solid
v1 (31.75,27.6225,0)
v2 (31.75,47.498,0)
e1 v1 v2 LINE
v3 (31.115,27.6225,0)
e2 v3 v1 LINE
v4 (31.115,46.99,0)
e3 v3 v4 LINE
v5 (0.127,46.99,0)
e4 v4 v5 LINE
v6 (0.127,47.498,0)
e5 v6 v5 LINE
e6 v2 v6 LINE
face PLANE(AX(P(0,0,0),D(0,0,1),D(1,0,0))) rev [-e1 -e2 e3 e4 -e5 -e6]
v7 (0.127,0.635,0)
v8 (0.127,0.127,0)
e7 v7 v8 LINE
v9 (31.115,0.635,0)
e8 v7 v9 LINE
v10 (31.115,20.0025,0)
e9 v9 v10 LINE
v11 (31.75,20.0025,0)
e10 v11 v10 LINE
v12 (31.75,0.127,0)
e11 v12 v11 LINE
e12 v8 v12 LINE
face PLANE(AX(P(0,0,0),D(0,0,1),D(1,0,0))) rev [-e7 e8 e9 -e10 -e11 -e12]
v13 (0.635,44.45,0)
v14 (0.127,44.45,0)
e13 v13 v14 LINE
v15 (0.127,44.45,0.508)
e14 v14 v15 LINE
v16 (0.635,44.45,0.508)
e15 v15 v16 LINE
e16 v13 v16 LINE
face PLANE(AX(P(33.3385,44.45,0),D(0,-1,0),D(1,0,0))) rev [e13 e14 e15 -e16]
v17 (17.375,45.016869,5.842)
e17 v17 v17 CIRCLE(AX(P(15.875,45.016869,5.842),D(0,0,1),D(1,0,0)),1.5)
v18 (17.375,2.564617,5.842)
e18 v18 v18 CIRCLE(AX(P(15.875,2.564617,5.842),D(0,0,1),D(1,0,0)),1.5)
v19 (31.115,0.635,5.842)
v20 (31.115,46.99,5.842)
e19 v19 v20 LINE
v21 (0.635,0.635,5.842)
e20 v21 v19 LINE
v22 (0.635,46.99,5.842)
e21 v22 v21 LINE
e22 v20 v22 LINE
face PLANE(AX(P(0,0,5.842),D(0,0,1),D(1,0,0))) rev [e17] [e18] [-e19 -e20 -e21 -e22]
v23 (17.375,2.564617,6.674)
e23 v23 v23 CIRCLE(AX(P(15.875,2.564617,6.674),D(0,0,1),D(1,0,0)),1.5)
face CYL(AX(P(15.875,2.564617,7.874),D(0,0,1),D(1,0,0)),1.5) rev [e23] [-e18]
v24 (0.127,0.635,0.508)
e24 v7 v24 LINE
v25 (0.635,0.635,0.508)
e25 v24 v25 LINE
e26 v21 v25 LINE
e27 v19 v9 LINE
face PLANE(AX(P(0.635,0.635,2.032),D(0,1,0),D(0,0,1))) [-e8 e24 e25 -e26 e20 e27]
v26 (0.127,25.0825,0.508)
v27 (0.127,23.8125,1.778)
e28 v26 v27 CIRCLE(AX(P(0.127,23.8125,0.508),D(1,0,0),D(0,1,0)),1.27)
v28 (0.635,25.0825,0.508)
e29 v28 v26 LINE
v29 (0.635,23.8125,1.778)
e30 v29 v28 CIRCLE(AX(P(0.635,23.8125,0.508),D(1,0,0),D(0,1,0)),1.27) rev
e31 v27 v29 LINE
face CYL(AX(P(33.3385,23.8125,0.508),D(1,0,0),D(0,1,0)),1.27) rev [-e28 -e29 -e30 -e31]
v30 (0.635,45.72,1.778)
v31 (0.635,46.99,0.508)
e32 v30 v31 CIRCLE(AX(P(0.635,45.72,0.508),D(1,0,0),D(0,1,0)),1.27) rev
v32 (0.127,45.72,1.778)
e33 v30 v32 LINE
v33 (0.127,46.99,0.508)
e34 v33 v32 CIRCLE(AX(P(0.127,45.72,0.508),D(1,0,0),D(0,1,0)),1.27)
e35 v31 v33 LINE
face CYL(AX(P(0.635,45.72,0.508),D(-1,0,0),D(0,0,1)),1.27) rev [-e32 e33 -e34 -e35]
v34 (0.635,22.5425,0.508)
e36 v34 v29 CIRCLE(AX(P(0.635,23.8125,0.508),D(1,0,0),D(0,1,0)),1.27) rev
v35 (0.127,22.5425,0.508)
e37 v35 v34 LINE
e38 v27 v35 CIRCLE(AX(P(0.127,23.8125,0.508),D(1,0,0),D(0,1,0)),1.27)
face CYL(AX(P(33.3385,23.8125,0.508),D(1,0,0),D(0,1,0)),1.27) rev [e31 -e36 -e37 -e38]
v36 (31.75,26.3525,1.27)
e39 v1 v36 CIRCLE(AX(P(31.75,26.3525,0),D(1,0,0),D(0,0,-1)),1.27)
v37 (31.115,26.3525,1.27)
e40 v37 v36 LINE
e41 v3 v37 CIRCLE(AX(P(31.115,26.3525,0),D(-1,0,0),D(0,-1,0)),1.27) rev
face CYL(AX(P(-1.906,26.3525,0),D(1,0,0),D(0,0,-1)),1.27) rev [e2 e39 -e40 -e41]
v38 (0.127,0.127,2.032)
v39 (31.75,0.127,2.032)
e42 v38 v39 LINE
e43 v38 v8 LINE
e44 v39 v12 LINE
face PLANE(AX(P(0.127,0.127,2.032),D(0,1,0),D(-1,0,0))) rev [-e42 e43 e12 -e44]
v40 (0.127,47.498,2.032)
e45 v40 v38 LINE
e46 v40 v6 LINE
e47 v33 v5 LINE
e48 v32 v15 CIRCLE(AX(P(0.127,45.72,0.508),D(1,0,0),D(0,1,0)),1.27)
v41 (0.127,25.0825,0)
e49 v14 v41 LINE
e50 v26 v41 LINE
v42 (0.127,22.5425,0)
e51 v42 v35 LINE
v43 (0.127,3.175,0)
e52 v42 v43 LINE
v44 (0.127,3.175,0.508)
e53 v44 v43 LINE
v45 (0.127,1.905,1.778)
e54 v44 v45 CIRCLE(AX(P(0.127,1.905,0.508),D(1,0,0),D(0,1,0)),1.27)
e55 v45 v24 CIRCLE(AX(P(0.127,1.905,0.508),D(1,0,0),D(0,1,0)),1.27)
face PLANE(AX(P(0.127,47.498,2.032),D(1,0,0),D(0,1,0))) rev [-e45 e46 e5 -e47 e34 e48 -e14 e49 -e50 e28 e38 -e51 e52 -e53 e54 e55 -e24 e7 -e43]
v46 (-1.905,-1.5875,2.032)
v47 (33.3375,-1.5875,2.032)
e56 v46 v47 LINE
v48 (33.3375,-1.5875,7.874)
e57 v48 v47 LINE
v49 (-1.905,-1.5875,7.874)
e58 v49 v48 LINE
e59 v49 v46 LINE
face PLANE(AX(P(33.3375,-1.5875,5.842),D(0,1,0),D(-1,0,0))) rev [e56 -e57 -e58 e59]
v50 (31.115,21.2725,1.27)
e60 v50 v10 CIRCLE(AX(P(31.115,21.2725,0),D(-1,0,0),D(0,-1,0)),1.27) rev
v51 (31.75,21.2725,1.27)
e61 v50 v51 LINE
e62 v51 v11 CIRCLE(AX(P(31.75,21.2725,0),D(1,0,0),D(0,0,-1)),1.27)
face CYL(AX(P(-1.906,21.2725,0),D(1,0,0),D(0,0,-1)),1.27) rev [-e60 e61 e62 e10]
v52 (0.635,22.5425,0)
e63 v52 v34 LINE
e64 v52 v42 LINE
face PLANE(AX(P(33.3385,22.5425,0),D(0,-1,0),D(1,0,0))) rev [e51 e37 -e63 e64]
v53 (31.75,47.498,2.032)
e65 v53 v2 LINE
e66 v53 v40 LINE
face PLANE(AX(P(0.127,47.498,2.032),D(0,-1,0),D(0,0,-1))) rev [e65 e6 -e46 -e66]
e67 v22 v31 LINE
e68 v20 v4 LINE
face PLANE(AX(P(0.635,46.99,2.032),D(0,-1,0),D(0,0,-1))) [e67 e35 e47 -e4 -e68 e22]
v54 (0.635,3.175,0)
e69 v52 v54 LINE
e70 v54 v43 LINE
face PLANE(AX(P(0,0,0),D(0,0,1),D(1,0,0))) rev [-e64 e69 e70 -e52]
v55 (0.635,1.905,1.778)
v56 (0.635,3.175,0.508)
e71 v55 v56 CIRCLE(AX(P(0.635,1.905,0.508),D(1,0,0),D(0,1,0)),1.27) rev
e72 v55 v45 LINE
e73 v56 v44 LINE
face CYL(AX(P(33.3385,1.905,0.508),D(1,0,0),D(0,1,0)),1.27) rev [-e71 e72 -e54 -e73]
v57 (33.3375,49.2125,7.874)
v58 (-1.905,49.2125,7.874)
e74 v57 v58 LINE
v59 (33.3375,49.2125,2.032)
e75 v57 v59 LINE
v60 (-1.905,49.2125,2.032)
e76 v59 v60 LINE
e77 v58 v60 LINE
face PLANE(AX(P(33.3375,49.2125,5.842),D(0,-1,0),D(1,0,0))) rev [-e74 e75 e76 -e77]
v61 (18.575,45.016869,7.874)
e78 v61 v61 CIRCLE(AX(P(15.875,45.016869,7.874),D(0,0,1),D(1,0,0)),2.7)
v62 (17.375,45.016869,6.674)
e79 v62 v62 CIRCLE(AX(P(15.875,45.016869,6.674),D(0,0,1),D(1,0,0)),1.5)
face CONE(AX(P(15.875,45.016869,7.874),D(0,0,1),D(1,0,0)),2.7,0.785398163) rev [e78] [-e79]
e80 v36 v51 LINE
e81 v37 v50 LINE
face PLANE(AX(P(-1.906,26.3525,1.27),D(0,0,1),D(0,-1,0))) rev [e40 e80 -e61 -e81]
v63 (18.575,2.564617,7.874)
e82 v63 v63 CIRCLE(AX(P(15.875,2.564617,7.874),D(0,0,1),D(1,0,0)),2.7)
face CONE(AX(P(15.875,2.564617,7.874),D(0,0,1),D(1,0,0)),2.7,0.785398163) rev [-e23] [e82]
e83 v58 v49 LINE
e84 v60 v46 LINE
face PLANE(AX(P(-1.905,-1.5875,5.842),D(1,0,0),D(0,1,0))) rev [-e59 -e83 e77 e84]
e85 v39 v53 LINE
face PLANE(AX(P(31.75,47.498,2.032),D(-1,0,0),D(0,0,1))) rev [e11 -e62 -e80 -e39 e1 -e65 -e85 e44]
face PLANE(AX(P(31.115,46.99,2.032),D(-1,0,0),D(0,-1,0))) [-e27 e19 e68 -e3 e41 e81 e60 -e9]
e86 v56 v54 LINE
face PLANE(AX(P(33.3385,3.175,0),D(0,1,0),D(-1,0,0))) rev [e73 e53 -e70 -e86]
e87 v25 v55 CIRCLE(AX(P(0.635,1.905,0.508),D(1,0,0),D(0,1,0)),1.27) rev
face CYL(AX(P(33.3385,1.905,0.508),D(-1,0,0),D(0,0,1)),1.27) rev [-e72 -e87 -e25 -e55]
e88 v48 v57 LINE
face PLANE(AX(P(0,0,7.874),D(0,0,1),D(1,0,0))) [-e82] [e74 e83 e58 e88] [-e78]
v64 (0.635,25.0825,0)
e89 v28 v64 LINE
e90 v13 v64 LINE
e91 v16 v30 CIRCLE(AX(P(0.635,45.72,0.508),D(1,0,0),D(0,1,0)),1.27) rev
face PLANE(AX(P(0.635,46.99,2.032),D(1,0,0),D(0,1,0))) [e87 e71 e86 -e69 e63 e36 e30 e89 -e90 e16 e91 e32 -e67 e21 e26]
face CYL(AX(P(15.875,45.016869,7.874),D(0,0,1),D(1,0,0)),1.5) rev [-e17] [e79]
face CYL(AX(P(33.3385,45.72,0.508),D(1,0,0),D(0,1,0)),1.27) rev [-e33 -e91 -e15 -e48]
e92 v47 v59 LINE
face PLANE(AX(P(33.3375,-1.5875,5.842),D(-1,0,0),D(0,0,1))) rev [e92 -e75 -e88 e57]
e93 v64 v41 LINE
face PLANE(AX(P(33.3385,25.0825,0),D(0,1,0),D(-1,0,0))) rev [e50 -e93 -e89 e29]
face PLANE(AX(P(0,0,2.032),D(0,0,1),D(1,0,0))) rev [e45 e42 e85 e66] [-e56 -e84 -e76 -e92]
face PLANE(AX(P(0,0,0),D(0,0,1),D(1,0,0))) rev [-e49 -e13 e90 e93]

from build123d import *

# Parameters (mm, degrees)
SKETCH2_W                                       = 31.623
SKETCH2_H                                       = 47.371
SKETCH2_W_2                                     = 30.48
SKETCH2_H_2                                     = 46.355
BOSS_EXTRUDE1_DEPTH                             = 2.032
SKETCH3_W                                       = 35.2425
SKETCH3_H                                       = 50.8
SKETCH3_W_2                                     = 30.48
SKETCH3_H_2                                     = 46.355
BOSS_EXTRUDE2_DEPTH                             = 3.81
SKETCH4_W                                       = 35.2425
SKETCH4_H                                       = 50.8
BOSS_EXTRUDE3_DEPTH                             = 2.032
CUT_EXTRUDE1_REACH                              = 62.138
CUT_EXTRUDE2_REACH                              = 61.89
SKETCH6_W                                       = 1.778
SKETCH6_H                                       = 2.54
FILLET1_R                                       = 1.27
CSK_FOR_M3_FLAT_HEAD_MACHINE_SCREW1_D           = 3
CSK_FOR_M3_FLAT_HEAD_MACHINE_SCREW1_CSINK_D     = 5.4
CSK_FOR_M3_FLAT_HEAD_MACHINE_SCREW1_CSINK_ANGLE = 90


with BuildPart() as part:
    # Sketch2 → Boss-Extrude1 (new body)
    with BuildSketch(Plane.XY):
        with Locations((15.9385, 23.8125)):
            Rectangle(SKETCH2_W, SKETCH2_H)
        with Locations((15.875, 23.8125)):
            Rectangle(SKETCH2_W_2, SKETCH2_H_2, mode=Mode.SUBTRACT)
    extrude(amount=BOSS_EXTRUDE1_DEPTH)

    # Sketch3 → Boss-Extrude2 (add)
    with BuildSketch(Plane.XY.offset(2.032)):
        with Locations((15.71625, 23.8125)):
            Rectangle(SKETCH3_W, SKETCH3_H)
        with Locations((15.875, 23.8125)):
            Rectangle(SKETCH3_W_2, SKETCH3_H_2, mode=Mode.SUBTRACT)
    extrude(amount=BOSS_EXTRUDE2_DEPTH)

    # Sketch4 → Boss-Extrude3 (add)
    with BuildSketch(Plane.XY.offset(5.842)):
        with Locations((15.71625, 23.8125)):
            Rectangle(SKETCH4_W, SKETCH4_H)
    extrude(amount=BOSS_EXTRUDE3_DEPTH)

    # Sketch5 → Cut-Extrude1 (cut, up to next)
    with BuildSketch(Plane(origin=(31.75, 0, 0), x_dir=(0, 0, -1), z_dir=(1, 0, 0)), mode=Mode.PRIVATE) as cut_extrude1_sk1:
        with BuildLine():
            Line((1.27, 26.3525), (1.27, 21.2725))
            ThreePointArc((1.27, 21.2725), (0, 20.0025), (-1.27, 21.2725))
            Line((-1.27, 21.2725), (-1.27, 26.3525))
            ThreePointArc((-1.27, 26.3525), (0, 27.6225), (1.27, 26.3525))
        make_face()
    cut_extrude1_tool1 = extrude(cut_extrude1_sk1.sketch, amount=-CUT_EXTRUDE1_REACH, mode=Mode.PRIVATE) & part.part
    add(cut_extrude1_tool1.solids().sort_by_distance((31.75, 23.8125, 0))[0], mode=Mode.SUBTRACT)

    # Sketch6 → Cut-Extrude2 (cut, up to next)
    with BuildSketch(Plane.ZY.offset(-0.127), mode=Mode.PRIVATE) as cut_extrude2_sk1:
        with Locations((0.889, 45.72)):
            Rectangle(SKETCH6_W, SKETCH6_H)
    cut_extrude2_tool1 = extrude(cut_extrude2_sk1.sketch, amount=-CUT_EXTRUDE2_REACH, mode=Mode.PRIVATE) & part.part
    # Sketch6 → Cut-Extrude2 (cut, up to next)
    with BuildSketch(Plane.ZY.offset(-0.127), mode=Mode.PRIVATE) as cut_extrude2_sk2:
        with Locations((0.889, 1.905)):
            Rectangle(SKETCH6_W, SKETCH6_H)
    cut_extrude2_tool2 = extrude(cut_extrude2_sk2.sketch, amount=-CUT_EXTRUDE2_REACH, mode=Mode.PRIVATE) & part.part
    # Sketch6 → Cut-Extrude2 (cut, up to next)
    with BuildSketch(Plane.ZY.offset(-0.127), mode=Mode.PRIVATE) as cut_extrude2_sk3:
        with Locations((0.889, 23.8125)):
            Rectangle(SKETCH6_W, SKETCH6_H)
    cut_extrude2_tool3 = extrude(cut_extrude2_sk3.sketch, amount=-CUT_EXTRUDE2_REACH, mode=Mode.PRIVATE) & part.part
    add(cut_extrude2_tool1.solids().sort_by_distance((0.127, 45.72, 0.889))[0], mode=Mode.SUBTRACT)
    add(cut_extrude2_tool2.solids().sort_by_distance((0.127, 1.905, 0.889))[0], mode=Mode.SUBTRACT)
    add(cut_extrude2_tool3.solids().sort_by_distance((0.127, 23.8125, 0.889))[0], mode=Mode.SUBTRACT)

    # Fillet1
    fillet1_edges = [part.edges().sort_by_distance(p)[0] for p in [
        (0.381, 3.175, 1.778),
        (0.381, 0.635, 1.778),
        (0.381, 22.5425, 1.778),
        (0.381, 25.0825, 1.778),
        (0.381, 46.99, 1.778),
        (0.381, 44.45, 1.778),
    ]]
    fillet(fillet1_edges, radius=FILLET1_R - 0.0001)  # a hair under: the kernel refuses the full size

    # CSK for M3 Flat Head Machine Screw1 (through all)
    with Locations(Plane.XY.offset(7.874)):
        with Locations((15.875, 2.564617431), (15.875, 45.016869066)):
            CounterSinkHole(CSK_FOR_M3_FLAT_HEAD_MACHINE_SCREW1_D / 2, CSK_FOR_M3_FLAT_HEAD_MACHINE_SCREW1_CSINK_D / 2, counter_sink_angle=CSK_FOR_M3_FLAT_HEAD_MACHINE_SCREW1_CSINK_ANGLE)


solid = part.part
